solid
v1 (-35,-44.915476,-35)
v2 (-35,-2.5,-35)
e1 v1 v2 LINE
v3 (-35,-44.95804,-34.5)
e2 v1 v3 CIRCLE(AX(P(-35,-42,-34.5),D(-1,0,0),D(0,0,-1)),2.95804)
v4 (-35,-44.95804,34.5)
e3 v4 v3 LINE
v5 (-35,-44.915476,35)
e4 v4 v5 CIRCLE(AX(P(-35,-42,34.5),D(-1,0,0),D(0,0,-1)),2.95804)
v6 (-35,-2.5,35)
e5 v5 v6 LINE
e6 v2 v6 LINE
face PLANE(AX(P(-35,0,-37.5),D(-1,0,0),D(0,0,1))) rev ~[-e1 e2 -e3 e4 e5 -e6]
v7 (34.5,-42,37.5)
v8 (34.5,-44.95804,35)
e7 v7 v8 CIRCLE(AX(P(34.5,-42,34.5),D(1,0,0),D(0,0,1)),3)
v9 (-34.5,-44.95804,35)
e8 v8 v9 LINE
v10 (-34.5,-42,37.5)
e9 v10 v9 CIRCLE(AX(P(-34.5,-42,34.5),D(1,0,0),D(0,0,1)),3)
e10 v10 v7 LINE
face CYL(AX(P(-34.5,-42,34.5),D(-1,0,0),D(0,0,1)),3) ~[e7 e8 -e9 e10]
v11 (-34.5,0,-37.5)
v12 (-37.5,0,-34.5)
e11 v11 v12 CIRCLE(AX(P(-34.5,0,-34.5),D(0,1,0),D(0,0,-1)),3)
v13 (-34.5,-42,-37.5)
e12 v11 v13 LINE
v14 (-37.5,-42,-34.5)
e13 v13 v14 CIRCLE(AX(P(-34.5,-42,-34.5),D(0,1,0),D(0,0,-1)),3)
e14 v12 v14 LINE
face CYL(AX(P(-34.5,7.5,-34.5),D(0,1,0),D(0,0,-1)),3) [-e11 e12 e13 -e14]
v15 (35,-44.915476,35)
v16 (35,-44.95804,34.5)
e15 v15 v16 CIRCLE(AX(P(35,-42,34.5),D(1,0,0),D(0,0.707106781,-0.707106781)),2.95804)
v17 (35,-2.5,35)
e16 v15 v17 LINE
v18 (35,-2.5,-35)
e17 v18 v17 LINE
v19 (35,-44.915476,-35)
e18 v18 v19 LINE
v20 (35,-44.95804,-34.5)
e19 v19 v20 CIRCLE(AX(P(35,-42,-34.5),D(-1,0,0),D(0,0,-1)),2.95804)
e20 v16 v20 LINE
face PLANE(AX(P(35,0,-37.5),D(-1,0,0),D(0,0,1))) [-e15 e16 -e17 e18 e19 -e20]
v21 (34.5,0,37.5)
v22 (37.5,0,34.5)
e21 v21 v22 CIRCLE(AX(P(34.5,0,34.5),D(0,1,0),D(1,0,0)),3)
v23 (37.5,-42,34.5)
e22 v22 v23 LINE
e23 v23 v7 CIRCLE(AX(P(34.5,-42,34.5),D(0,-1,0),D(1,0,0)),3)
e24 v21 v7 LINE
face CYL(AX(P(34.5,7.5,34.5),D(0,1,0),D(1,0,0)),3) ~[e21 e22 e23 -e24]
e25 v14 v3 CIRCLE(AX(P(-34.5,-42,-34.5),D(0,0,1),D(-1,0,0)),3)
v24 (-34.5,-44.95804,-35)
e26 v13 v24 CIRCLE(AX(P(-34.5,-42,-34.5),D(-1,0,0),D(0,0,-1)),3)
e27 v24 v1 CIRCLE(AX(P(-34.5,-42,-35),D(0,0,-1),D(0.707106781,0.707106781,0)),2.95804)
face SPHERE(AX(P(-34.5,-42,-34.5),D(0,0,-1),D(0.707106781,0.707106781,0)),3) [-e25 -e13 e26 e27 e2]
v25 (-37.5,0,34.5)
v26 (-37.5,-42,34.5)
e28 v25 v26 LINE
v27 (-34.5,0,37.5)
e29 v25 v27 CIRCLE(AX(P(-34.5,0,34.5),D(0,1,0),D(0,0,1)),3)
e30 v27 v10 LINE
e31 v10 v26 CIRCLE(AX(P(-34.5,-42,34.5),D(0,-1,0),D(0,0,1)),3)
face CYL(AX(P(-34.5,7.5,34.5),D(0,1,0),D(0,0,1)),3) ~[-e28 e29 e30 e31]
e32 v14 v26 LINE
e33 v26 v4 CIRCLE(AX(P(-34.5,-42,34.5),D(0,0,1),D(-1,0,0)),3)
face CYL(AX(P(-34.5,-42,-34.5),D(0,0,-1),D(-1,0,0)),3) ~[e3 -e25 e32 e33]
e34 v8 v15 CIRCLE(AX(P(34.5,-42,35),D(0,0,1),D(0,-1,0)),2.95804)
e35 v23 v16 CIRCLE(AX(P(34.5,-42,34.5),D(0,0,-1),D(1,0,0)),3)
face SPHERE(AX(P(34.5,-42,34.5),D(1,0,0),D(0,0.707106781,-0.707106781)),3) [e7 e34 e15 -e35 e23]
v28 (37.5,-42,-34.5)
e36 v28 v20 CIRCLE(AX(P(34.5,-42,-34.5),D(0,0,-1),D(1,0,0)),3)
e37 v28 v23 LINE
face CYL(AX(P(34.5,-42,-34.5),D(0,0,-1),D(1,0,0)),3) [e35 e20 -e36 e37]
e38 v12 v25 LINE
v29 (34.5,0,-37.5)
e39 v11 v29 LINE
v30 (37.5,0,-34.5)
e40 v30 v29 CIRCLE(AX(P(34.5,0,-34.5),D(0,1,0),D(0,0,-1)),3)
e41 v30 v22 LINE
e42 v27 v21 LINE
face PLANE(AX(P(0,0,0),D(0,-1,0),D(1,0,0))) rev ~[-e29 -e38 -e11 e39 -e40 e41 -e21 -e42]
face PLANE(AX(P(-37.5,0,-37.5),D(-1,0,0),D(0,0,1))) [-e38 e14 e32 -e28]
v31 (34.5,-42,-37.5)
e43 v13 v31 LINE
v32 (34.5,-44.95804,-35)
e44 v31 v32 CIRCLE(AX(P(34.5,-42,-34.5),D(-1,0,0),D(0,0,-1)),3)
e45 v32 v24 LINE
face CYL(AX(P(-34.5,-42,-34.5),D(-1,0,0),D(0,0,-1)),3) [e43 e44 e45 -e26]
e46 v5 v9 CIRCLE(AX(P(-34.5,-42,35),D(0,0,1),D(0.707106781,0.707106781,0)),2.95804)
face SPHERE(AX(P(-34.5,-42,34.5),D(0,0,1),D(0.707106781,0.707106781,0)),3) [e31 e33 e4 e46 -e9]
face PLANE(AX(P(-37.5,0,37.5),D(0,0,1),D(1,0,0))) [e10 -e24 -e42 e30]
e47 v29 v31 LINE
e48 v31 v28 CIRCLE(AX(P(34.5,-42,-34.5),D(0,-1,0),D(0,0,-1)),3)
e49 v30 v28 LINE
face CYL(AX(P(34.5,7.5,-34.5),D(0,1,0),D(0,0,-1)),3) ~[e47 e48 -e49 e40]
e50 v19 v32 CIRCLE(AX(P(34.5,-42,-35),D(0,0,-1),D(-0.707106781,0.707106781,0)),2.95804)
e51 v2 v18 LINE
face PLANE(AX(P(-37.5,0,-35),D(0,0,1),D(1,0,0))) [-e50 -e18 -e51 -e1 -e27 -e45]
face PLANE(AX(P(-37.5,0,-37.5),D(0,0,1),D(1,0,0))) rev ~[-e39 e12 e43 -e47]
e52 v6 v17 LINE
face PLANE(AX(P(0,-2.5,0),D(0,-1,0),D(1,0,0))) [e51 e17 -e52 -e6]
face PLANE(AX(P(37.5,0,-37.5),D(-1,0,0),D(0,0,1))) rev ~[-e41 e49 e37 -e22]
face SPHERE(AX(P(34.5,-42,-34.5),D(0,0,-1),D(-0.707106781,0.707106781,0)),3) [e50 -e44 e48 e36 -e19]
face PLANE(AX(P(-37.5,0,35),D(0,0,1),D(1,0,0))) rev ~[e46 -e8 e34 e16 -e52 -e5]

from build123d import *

# Parameters (mm, degrees)
F0_W         = 75
F0_H         = 75
F1_DEPTH     = 45
F2_T         = -2.5
F4_T1_DEPTH  = 49.5
F4_T3_DEPTH  = 69
F4_T5_DEPTH  = 69
F4_S9_W      = 3
F4_S9_H      = 3
F4_T10_DEPTH = 3
F4_S15_W     = 3
F4_S15_H     = 3
F4_T16_DEPTH = 3
F4_S21_W     = 3
F4_S21_H     = 3
F4_T22_DEPTH = 3
F4_S27_W     = 3
F4_S27_H     = 3
F4_T28_DEPTH = 3


# Not quite as in the source:
# - a fillet or chamfer that OpenCascade refuses, or shapes differently, is made with other operations: its cross-section is extruded or revolved along the edge and cut away or added
# - a feature of the source that left no trace in its solid (it failed there, or was rolled back) is left out


with BuildPart() as f1:
    # F0 (on Front) → F1 (new body)
    with BuildSketch(Plane.XZ):
        Rectangle(F0_W, F0_H)
    extrude(amount=F1_DEPTH)

    # F2
    f2_openings = [f1.faces().sort_by_distance(p)[0] for p in [
        (0, -45, 0),
    ]]
    offset(amount=F2_T, openings=f2_openings)

    # F4: fillet of radius 3 on 8 edges, made by hand

    # F4_s2 → F4_t1 (cut)
    with BuildSketch(Plane.XZ.offset(-7.5)):
        with BuildLine():
            ThreePointArc((-34.5, 37.5), (-36.6213203436, 36.6213203436), (-37.5, 34.5))
            Line((-37.5, 34.5), (-37.5, 37.5))
            Line((-37.5, 37.5), (-34.5, 37.5))
        make_face()
        with BuildLine():
            ThreePointArc((-34.5, -37.5), (-36.6213203436, -36.6213203436), (-37.5, -34.5))
            Line((-37.5, -34.5), (-37.5, -37.5))
            Line((-37.5, -37.5), (-34.5, -37.5))
        make_face()
        with BuildLine():
            ThreePointArc((34.5, -37.5), (36.6213203436, -36.6213203436), (37.5, -34.5))
            Line((37.5, -34.5), (37.5, -37.5))
            Line((37.5, -37.5), (34.5, -37.5))
        make_face()
        with BuildLine():
            ThreePointArc((37.5, 34.5), (36.6213203436, 36.6213203436), (34.5, 37.5))
            Line((34.5, 37.5), (37.5, 37.5))
            Line((37.5, 37.5), (37.5, 34.5))
        make_face()
    extrude(amount=F4_T1_DEPTH, mode=Mode.SUBTRACT)

    # F4_s4 → F4_t3 (cut)
    with BuildSketch(Plane.YZ.offset(-34.5)):
        with BuildLine():
            ThreePointArc((-42, -37.5), (-44.1213203436, -36.6213203436), (-45, -34.5))
            Line((-45, -34.5), (-45, -37.5))
            Line((-45, -37.5), (-42, -37.5))
        make_face()
        with BuildLine():
            ThreePointArc((-42, 37.5), (-44.1213203436, 36.6213203436), (-45, 34.5))
            Line((-45, 34.5), (-45, 37.5))
            Line((-45, 37.5), (-42, 37.5))
        make_face()
    extrude(amount=F4_T3_DEPTH, mode=Mode.SUBTRACT)

    # F4_s6 → F4_t5 (cut)
    with BuildSketch(Plane.XY.offset(-34.5)):
        with BuildLine():
            ThreePointArc((37.5, -42), (36.6213203436, -44.1213203436), (34.5, -45))
            Line((34.5, -45), (37.5, -45))
            Line((37.5, -45), (37.5, -42))
        make_face()
        with BuildLine():
            ThreePointArc((-37.5, -42), (-36.6213203436, -44.1213203436), (-34.5, -45))
            Line((-34.5, -45), (-37.5, -45))
            Line((-37.5, -45), (-37.5, -42))
        make_face()
    extrude(amount=F4_T5_DEPTH, mode=Mode.SUBTRACT)


with BuildPart() as f4_tool8:
    # F4_s9 → F4_t10 (new body)
    with BuildSketch(Plane.XY.offset(34.5)):
        with Locations((-36, -43.5)):
            Rectangle(F4_S9_W, F4_S9_H)
    extrude(amount=F4_T10_DEPTH)

    # F4_s11 → F4_t12 (revolve, cut)
    with BuildSketch(Plane(origin=(-34.5, -42, 34.5), x_dir=(0.7071067812, 0.7071067812, 0), z_dir=(0.7071067812, -0.7071067812, 0))):
        with BuildLine():
            ThreePointArc((0, -3), (3, 0), (0, 3))
            Line((0, 3), (0, -3))
        make_face()
    revolve(axis=Axis((-34.5, -42, 34.5), (0, 0, 1)), mode=Mode.SUBTRACT)


with BuildPart() as f1_1:
    add(f1.part)

    # F4_t7: cut F4_tool8
    add(f4_tool8.part, mode=Mode.SUBTRACT)


with BuildPart() as f4_tool14:
    # F4_s15 → F4_t16 (new body)
    with BuildSketch(Plane.XY.offset(-34.5)):
        with Locations((-36, -43.5)):
            Rectangle(F4_S15_W, F4_S15_H)
    extrude(amount=-F4_T16_DEPTH)

    # F4_s17 → F4_t18 (revolve, cut)
    with BuildSketch(Plane(origin=(-34.5, -42, -34.5), x_dir=(0.7071067812, 0.7071067812, 0), z_dir=(-0.7071067812, 0.7071067812, 0))):
        with BuildLine():
            ThreePointArc((0, -3), (3, 0), (0, 3))
            Line((0, 3), (0, -3))
        make_face()
    revolve(axis=Axis((-34.5, -42, -34.5), (0, 0, -1)), mode=Mode.SUBTRACT)


with BuildPart() as f1_2:
    add(f1_1.part)

    # F4_t13: cut F4_tool14
    add(f4_tool14.part, mode=Mode.SUBTRACT)


with BuildPart() as f4_tool20:
    # F4_s21 → F4_t22 (new body)
    with BuildSketch(Plane.XY.offset(-34.5)):
        with Locations((36, -43.5)):
            Rectangle(F4_S21_W, F4_S21_H)
    extrude(amount=-F4_T22_DEPTH)

    # F4_s23 → F4_t24 (revolve, cut)
    with BuildSketch(Plane(origin=(34.5, -42, -34.5), x_dir=(-0.7071067812, 0.7071067812, 0), z_dir=(-0.7071067812, -0.7071067812, 0))):
        with BuildLine():
            ThreePointArc((0, -3), (3, 0), (0, 3))
            Line((0, 3), (0, -3))
        make_face()
    revolve(axis=Axis((34.5, -42, -34.5), (0, 0, -1)), mode=Mode.SUBTRACT)


with BuildPart() as f1_3:
    add(f1_2.part)

    # F4_t19: cut F4_tool20
    add(f4_tool20.part, mode=Mode.SUBTRACT)


with BuildPart() as f4_tool26:
    # F4_s27 → F4_t28 (new body)
    with BuildSketch(Plane.YZ.offset(34.5)):
        with Locations((-43.5, 36)):
            Rectangle(F4_S27_W, F4_S27_H)
    extrude(amount=F4_T28_DEPTH)

    # F4_s29 → F4_t30 (revolve, cut)
    with BuildSketch(Plane(origin=(34.5, -42, 34.5), x_dir=(0, 0.7071067812, -0.7071067812), z_dir=(0, -0.7071067812, -0.7071067812))):
        with BuildLine():
            ThreePointArc((0, -3), (3, 0), (0, 3))
            Line((0, 3), (0, -3))
        make_face()
    revolve(axis=Axis((34.5, -42, 34.5), (1, 0, 0)), mode=Mode.SUBTRACT)


with BuildPart() as f1_4:
    add(f1_3.part)

    # F4_t25: cut F4_tool26
    add(f4_tool26.part, mode=Mode.SUBTRACT)


solid = f1_4.part
